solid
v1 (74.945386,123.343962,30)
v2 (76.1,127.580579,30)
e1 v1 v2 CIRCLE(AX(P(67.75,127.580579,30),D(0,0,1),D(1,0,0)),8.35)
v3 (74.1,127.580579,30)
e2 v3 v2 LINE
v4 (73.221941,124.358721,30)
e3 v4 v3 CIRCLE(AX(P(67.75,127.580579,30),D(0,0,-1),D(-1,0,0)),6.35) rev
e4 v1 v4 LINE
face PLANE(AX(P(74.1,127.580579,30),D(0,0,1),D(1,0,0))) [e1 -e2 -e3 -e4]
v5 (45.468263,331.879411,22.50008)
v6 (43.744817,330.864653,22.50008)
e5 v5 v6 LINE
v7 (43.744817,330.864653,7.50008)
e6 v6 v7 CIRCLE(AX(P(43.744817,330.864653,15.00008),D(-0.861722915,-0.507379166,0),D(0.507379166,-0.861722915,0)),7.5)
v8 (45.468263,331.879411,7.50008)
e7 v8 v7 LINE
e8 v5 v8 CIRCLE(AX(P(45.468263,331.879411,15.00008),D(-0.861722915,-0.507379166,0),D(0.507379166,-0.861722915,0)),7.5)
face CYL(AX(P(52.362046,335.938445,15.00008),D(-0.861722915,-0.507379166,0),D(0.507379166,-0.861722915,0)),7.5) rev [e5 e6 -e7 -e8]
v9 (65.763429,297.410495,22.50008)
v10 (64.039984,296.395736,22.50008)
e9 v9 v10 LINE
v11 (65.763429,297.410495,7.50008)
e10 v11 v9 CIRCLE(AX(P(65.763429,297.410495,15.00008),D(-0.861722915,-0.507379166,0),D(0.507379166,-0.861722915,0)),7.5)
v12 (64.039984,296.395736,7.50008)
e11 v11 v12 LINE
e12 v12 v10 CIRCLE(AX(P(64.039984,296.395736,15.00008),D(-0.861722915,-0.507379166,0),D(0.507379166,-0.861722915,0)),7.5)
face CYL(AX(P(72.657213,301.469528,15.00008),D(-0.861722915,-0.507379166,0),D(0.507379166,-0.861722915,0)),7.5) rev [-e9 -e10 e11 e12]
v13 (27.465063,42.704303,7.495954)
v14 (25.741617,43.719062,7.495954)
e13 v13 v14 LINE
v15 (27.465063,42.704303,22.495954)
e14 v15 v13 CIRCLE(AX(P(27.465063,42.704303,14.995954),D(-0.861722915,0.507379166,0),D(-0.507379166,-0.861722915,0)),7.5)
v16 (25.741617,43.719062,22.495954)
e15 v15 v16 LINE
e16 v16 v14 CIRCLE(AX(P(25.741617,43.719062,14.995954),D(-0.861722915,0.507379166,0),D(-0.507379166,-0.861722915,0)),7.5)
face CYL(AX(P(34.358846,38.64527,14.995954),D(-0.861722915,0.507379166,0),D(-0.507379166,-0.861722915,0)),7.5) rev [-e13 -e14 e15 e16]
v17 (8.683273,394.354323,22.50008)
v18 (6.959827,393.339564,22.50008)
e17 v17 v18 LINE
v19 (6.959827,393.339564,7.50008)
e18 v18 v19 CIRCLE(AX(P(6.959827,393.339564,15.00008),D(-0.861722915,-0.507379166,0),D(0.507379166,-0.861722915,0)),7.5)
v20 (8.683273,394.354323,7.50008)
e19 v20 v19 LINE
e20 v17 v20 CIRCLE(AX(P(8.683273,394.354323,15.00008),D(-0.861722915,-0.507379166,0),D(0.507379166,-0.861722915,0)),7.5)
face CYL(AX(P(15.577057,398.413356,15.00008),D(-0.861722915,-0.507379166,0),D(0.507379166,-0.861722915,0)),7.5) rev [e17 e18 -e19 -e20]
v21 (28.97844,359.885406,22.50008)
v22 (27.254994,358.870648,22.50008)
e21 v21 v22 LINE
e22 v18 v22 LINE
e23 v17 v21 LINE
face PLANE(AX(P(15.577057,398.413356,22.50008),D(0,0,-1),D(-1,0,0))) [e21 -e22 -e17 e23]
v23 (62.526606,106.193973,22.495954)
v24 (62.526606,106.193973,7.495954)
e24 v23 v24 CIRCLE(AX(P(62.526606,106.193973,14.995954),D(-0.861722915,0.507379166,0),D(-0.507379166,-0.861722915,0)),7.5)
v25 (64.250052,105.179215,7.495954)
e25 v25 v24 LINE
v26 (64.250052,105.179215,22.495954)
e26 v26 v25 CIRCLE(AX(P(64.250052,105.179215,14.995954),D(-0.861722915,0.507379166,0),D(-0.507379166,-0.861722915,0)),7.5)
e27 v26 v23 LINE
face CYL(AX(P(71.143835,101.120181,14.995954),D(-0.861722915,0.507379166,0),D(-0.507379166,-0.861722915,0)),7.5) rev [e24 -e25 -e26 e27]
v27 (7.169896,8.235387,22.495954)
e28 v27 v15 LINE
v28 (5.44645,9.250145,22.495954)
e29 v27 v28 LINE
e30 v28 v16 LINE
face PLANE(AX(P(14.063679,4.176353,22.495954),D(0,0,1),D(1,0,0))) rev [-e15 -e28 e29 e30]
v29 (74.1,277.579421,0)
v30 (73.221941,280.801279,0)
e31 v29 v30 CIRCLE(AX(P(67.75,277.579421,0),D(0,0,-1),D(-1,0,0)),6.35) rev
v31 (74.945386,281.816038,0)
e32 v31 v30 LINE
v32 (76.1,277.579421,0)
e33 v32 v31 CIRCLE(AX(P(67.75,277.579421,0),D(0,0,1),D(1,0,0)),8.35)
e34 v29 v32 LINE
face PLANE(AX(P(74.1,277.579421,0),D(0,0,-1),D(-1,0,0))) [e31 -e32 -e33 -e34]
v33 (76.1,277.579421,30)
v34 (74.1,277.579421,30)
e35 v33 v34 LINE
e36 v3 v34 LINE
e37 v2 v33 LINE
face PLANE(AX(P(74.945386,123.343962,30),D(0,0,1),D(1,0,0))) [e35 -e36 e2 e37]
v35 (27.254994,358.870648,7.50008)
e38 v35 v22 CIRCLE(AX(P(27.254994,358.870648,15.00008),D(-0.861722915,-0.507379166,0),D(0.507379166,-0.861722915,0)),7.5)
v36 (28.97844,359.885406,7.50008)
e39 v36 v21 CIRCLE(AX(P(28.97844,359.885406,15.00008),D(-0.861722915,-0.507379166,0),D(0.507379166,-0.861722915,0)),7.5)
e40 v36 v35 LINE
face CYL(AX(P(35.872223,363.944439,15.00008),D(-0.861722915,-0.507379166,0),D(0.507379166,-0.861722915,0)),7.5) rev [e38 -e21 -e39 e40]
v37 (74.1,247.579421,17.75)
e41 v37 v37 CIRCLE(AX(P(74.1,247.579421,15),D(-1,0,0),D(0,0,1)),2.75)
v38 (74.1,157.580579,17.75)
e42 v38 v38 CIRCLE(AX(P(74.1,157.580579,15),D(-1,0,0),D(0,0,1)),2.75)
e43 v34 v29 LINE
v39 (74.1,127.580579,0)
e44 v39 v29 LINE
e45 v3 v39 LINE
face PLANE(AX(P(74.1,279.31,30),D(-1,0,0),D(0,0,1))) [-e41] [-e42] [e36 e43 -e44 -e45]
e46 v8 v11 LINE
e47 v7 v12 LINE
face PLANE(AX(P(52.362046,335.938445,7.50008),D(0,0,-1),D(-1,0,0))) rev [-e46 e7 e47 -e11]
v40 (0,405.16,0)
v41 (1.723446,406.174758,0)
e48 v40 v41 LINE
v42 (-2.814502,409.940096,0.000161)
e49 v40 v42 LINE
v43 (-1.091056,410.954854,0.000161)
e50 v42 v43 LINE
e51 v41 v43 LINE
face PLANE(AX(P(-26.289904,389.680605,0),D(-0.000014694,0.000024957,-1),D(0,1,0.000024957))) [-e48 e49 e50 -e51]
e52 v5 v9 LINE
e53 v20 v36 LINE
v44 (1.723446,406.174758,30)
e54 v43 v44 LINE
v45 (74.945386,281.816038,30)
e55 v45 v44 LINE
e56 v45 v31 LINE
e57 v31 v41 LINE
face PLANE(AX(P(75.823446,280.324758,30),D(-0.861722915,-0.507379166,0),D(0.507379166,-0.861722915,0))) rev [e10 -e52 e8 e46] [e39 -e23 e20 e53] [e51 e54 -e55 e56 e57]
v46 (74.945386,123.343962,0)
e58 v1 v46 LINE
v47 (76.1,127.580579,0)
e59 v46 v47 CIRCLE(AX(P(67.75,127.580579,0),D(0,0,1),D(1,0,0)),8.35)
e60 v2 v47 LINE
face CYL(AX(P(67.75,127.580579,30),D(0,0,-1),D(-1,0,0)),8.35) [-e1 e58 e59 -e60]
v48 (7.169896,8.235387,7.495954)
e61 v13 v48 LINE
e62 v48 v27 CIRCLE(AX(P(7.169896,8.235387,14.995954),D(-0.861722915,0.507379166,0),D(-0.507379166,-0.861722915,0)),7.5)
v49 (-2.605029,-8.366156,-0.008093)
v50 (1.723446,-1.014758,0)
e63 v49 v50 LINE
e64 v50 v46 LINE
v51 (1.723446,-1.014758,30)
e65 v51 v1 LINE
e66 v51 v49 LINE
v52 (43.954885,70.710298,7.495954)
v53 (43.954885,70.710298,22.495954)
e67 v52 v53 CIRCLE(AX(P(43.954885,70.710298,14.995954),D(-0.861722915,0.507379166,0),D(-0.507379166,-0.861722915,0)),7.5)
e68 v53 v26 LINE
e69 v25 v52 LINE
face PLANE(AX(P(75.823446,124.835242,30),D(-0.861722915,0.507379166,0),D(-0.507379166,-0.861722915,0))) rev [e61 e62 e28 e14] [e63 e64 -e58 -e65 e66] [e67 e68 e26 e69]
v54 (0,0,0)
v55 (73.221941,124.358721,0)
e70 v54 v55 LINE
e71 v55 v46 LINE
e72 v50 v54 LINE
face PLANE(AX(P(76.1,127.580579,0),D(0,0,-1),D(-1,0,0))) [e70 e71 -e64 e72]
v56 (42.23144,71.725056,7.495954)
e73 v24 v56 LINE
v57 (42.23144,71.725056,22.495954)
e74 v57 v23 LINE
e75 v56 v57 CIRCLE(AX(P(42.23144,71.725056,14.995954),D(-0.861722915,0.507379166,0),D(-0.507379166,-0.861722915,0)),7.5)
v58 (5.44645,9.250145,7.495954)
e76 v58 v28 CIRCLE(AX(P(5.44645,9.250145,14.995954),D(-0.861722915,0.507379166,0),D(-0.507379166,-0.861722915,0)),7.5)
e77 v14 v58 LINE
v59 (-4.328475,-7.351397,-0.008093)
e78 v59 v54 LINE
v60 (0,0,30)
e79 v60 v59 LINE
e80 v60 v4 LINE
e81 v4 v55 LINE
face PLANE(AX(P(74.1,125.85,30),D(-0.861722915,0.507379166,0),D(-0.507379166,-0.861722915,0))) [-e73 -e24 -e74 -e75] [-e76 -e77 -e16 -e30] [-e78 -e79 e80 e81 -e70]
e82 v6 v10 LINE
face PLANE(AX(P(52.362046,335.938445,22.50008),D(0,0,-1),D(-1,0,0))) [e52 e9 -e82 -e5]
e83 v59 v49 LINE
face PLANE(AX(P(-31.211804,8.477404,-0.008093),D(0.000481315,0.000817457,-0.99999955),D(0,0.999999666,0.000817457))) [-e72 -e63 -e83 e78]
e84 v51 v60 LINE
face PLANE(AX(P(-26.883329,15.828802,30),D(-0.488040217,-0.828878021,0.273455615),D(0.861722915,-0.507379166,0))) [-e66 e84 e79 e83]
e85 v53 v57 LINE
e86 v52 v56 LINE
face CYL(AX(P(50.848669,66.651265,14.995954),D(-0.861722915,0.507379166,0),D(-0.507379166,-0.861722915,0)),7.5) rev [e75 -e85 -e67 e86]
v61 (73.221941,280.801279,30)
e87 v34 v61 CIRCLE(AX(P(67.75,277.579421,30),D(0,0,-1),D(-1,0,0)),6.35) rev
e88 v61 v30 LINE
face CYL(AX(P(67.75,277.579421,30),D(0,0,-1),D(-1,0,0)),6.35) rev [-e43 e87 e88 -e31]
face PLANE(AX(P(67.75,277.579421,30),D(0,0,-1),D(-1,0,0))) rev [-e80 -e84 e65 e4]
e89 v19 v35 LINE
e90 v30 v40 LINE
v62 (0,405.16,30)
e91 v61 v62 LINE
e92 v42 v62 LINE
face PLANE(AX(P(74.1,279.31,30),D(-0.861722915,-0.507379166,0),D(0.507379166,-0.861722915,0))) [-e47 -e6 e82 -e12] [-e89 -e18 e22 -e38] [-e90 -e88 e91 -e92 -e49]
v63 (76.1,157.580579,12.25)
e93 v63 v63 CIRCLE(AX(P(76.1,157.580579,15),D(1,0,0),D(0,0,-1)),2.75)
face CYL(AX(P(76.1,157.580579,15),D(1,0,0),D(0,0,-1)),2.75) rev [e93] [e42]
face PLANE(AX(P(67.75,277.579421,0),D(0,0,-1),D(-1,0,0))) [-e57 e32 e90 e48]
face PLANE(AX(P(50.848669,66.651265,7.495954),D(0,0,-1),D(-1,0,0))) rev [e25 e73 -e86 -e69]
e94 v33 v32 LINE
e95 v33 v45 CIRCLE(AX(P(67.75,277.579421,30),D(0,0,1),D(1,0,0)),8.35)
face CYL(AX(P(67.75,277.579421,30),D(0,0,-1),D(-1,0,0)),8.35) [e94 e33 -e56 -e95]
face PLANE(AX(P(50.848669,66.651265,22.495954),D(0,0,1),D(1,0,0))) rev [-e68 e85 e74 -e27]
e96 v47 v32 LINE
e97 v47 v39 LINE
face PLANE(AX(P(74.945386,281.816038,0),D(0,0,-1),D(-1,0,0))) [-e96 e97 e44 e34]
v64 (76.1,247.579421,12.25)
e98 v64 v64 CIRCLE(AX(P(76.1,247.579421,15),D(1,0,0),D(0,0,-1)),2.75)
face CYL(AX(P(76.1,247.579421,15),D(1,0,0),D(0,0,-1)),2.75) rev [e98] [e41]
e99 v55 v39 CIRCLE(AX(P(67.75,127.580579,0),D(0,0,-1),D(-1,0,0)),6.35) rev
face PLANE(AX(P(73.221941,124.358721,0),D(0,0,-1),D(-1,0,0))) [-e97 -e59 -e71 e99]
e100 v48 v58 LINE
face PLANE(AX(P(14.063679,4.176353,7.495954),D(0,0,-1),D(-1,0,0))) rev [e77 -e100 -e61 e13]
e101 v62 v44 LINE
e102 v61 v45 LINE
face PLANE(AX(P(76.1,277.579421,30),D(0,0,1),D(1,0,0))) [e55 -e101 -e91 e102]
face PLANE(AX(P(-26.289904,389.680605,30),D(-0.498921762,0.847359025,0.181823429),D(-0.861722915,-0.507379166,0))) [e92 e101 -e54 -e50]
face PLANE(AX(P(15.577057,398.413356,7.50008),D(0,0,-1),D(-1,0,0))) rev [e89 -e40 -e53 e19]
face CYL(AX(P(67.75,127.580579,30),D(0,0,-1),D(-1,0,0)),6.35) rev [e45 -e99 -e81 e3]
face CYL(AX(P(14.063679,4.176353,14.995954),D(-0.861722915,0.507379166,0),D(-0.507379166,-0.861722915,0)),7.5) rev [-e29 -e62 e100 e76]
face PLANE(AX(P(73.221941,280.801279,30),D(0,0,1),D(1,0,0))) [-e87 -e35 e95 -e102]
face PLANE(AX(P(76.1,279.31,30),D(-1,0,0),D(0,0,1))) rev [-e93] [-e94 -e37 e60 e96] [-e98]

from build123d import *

# Parameters (mm, degrees)
ODGI_CIE_BAZOWE1_DEPTH      = 30
OTW_R_POD_RUB_M51_D         = 5.5
OTW_R_POD_RUB_M51_DEPTH     = 14
OTW_R_POD_RUB_M51_TIP       = 1.652366702
DODANIE_WYCI_GNI_CIE1_DEPTH = 2
DODANIE_WYCI_GNI_CIE2_DEPTH = 2
WYTNIJ_WYCI_GNI_CIE1_DEPTH  = 10
WYTNIJ_WYCI_GNI_CIE3_DEPTH  = 10


# Sheet-metal steps are written as plain solids
with BuildPart() as part:
    # Szkic1 → Odgięcie bazowe1 (new body)
    with BuildSketch(Plane.XY):
        with BuildLine():
            Line((0, 405.16), (73.22194051, 280.801279174))
            ThreePointArc((73.22194051, 280.801279174), (73.876553772, 279.249103741), (74.1, 277.579421472))
            Line((74.1, 277.579421472), (74.1, 127.580578528))
            ThreePointArc((74.1, 127.580578528), (73.876553772, 125.910896259), (73.22194051, 124.358720826))
            Line((73.22194051, 124.358720826), (0, 0))
            Line((0, 0), (1.72344583, -1.014758331))
            Line((1.72344583, -1.014758331), (74.94538634, 123.343962495))
            ThreePointArc((74.94538634, 123.343962495), (75.806177007, 125.38501208), (76.1, 127.580578528))
            Line((76.1, 127.580578528), (76.1, 277.579421472))
            ThreePointArc((76.1, 277.579421472), (75.806177007, 279.77498792), (74.94538634, 281.816037505))
            Line((74.94538634, 281.816037505), (1.72344583, 406.174758331))
            Line((1.72344583, 406.174758331), (0, 405.16))
        make_face()
    extrude(amount=ODGI_CIE_BAZOWE1_DEPTH)

    # Otwór pod śrubę M51
    with Locations(Plane(origin=(76.1, 0, 0), x_dir=(0, 0, -1), z_dir=(1, 0, 0))):
        with Locations((-15, 157.580578528), (-15, 247.579421472)):
            Hole(OTW_R_POD_RUB_M51_D / 2, depth=OTW_R_POD_RUB_M51_DEPTH)
            with Locations((0, 0, -(OTW_R_POD_RUB_M51_DEPTH + OTW_R_POD_RUB_M51_TIP / 2))):  # 118° drill point
                Cone(0, OTW_R_POD_RUB_M51_D / 2, OTW_R_POD_RUB_M51_TIP, mode=Mode.SUBTRACT)

    # Szkic10 → Dodanie-wyciągnięcie1 (add)
    with BuildSketch(Plane(origin=(178.867603803, 105.316562907, 0), x_dir=(0, 0, -1), z_dir=(0.8617229149967045, 0.5073791656833994, 0))):
        Polygon((-30, 349.13565624), (-0.000160653, 354.682794047), (0, 349.13565624), align=None)
    extrude(amount=-DODANIE_WYCI_GNI_CIE1_DEPTH)

    # Szkic11 → Dodanie-wyciągnięcie2 (add)
    with BuildSketch(Plane(origin=(1.72344583, -1.014758331, 0), x_dir=(0, 0, -1), z_dir=(0.8617229149967046, -0.507379165683399, 0))):
        Polygon((-30, 0), (0.008092813, -8.531045483), (0, 0), align=None)
    extrude(amount=-DODANIE_WYCI_GNI_CIE2_DEPTH)

    # Szkic13 → Wytnij-wyciągnięcie1 (cut)
    with BuildSketch(Plane(origin=(0, 0, 0), x_dir=(0, 0, 1), z_dir=(-0.8617229149967046, 0.5073791656833994, 0))):
        with BuildLine():
            Line((7.495953593, 10.734477259), (7.495953593, 50.734477259))
            ThreePointArc((7.495953593, 50.734477259), (14.995953593, 58.234477259), (22.495953593, 50.734477259))
            Line((22.495953593, 50.734477259), (22.495953593, 10.734477259))
            ThreePointArc((22.495953593, 10.734477259), (14.995953593, 3.234477259), (7.495953593, 10.734477259))
        make_face()
        with BuildLine():
            Line((7.495953593, 83.234477259), (7.495953593, 123.234477259))
            ThreePointArc((7.495953593, 123.234477259), (14.995953593, 130.734477259), (22.495953593, 123.234477259))
            Line((22.495953593, 123.234477259), (22.495953593, 83.234477259))
            ThreePointArc((22.495953593, 83.234477259), (14.995953593, 75.734477259), (7.495953593, 83.234477259))
        make_face()
    extrude(amount=-WYTNIJ_WYCI_GNI_CIE1_DEPTH, mode=Mode.SUBTRACT)

    # Szkic12 → Wytnij-wyciągnięcie3 (cut)
    with BuildSketch(Plane(origin=(177.144157973, 104.301804576, 0), x_dir=(0, 0, 1), z_dir=(-0.8617229149967045, -0.5073791656833994, 0))):
        with BuildLine():
            Line((22.500080327, 335.4184445), (22.500080327, 295.4184445))
            ThreePointArc((22.500080327, 295.4184445), (15.000080327, 287.9184445), (7.500080327, 295.4184445))
            Line((7.500080327, 295.4184445), (7.500080327, 335.4184445))
            ThreePointArc((7.500080327, 335.4184445), (15.000080327, 342.9184445), (22.500080327, 335.4184445))
        make_face()
        with BuildLine():
            Line((22.500080327, 262.9184445), (22.500080327, 222.9184445))
            ThreePointArc((22.500080327, 222.9184445), (15.000080327, 215.4184445), (7.500080327, 222.9184445))
            Line((7.500080327, 222.9184445), (7.500080327, 262.9184445))
            ThreePointArc((7.500080327, 262.9184445), (15.000080327, 270.4184445), (22.500080327, 262.9184445))
        make_face()
    extrude(amount=-WYTNIJ_WYCI_GNI_CIE3_DEPTH, mode=Mode.SUBTRACT)


solid = part.part
